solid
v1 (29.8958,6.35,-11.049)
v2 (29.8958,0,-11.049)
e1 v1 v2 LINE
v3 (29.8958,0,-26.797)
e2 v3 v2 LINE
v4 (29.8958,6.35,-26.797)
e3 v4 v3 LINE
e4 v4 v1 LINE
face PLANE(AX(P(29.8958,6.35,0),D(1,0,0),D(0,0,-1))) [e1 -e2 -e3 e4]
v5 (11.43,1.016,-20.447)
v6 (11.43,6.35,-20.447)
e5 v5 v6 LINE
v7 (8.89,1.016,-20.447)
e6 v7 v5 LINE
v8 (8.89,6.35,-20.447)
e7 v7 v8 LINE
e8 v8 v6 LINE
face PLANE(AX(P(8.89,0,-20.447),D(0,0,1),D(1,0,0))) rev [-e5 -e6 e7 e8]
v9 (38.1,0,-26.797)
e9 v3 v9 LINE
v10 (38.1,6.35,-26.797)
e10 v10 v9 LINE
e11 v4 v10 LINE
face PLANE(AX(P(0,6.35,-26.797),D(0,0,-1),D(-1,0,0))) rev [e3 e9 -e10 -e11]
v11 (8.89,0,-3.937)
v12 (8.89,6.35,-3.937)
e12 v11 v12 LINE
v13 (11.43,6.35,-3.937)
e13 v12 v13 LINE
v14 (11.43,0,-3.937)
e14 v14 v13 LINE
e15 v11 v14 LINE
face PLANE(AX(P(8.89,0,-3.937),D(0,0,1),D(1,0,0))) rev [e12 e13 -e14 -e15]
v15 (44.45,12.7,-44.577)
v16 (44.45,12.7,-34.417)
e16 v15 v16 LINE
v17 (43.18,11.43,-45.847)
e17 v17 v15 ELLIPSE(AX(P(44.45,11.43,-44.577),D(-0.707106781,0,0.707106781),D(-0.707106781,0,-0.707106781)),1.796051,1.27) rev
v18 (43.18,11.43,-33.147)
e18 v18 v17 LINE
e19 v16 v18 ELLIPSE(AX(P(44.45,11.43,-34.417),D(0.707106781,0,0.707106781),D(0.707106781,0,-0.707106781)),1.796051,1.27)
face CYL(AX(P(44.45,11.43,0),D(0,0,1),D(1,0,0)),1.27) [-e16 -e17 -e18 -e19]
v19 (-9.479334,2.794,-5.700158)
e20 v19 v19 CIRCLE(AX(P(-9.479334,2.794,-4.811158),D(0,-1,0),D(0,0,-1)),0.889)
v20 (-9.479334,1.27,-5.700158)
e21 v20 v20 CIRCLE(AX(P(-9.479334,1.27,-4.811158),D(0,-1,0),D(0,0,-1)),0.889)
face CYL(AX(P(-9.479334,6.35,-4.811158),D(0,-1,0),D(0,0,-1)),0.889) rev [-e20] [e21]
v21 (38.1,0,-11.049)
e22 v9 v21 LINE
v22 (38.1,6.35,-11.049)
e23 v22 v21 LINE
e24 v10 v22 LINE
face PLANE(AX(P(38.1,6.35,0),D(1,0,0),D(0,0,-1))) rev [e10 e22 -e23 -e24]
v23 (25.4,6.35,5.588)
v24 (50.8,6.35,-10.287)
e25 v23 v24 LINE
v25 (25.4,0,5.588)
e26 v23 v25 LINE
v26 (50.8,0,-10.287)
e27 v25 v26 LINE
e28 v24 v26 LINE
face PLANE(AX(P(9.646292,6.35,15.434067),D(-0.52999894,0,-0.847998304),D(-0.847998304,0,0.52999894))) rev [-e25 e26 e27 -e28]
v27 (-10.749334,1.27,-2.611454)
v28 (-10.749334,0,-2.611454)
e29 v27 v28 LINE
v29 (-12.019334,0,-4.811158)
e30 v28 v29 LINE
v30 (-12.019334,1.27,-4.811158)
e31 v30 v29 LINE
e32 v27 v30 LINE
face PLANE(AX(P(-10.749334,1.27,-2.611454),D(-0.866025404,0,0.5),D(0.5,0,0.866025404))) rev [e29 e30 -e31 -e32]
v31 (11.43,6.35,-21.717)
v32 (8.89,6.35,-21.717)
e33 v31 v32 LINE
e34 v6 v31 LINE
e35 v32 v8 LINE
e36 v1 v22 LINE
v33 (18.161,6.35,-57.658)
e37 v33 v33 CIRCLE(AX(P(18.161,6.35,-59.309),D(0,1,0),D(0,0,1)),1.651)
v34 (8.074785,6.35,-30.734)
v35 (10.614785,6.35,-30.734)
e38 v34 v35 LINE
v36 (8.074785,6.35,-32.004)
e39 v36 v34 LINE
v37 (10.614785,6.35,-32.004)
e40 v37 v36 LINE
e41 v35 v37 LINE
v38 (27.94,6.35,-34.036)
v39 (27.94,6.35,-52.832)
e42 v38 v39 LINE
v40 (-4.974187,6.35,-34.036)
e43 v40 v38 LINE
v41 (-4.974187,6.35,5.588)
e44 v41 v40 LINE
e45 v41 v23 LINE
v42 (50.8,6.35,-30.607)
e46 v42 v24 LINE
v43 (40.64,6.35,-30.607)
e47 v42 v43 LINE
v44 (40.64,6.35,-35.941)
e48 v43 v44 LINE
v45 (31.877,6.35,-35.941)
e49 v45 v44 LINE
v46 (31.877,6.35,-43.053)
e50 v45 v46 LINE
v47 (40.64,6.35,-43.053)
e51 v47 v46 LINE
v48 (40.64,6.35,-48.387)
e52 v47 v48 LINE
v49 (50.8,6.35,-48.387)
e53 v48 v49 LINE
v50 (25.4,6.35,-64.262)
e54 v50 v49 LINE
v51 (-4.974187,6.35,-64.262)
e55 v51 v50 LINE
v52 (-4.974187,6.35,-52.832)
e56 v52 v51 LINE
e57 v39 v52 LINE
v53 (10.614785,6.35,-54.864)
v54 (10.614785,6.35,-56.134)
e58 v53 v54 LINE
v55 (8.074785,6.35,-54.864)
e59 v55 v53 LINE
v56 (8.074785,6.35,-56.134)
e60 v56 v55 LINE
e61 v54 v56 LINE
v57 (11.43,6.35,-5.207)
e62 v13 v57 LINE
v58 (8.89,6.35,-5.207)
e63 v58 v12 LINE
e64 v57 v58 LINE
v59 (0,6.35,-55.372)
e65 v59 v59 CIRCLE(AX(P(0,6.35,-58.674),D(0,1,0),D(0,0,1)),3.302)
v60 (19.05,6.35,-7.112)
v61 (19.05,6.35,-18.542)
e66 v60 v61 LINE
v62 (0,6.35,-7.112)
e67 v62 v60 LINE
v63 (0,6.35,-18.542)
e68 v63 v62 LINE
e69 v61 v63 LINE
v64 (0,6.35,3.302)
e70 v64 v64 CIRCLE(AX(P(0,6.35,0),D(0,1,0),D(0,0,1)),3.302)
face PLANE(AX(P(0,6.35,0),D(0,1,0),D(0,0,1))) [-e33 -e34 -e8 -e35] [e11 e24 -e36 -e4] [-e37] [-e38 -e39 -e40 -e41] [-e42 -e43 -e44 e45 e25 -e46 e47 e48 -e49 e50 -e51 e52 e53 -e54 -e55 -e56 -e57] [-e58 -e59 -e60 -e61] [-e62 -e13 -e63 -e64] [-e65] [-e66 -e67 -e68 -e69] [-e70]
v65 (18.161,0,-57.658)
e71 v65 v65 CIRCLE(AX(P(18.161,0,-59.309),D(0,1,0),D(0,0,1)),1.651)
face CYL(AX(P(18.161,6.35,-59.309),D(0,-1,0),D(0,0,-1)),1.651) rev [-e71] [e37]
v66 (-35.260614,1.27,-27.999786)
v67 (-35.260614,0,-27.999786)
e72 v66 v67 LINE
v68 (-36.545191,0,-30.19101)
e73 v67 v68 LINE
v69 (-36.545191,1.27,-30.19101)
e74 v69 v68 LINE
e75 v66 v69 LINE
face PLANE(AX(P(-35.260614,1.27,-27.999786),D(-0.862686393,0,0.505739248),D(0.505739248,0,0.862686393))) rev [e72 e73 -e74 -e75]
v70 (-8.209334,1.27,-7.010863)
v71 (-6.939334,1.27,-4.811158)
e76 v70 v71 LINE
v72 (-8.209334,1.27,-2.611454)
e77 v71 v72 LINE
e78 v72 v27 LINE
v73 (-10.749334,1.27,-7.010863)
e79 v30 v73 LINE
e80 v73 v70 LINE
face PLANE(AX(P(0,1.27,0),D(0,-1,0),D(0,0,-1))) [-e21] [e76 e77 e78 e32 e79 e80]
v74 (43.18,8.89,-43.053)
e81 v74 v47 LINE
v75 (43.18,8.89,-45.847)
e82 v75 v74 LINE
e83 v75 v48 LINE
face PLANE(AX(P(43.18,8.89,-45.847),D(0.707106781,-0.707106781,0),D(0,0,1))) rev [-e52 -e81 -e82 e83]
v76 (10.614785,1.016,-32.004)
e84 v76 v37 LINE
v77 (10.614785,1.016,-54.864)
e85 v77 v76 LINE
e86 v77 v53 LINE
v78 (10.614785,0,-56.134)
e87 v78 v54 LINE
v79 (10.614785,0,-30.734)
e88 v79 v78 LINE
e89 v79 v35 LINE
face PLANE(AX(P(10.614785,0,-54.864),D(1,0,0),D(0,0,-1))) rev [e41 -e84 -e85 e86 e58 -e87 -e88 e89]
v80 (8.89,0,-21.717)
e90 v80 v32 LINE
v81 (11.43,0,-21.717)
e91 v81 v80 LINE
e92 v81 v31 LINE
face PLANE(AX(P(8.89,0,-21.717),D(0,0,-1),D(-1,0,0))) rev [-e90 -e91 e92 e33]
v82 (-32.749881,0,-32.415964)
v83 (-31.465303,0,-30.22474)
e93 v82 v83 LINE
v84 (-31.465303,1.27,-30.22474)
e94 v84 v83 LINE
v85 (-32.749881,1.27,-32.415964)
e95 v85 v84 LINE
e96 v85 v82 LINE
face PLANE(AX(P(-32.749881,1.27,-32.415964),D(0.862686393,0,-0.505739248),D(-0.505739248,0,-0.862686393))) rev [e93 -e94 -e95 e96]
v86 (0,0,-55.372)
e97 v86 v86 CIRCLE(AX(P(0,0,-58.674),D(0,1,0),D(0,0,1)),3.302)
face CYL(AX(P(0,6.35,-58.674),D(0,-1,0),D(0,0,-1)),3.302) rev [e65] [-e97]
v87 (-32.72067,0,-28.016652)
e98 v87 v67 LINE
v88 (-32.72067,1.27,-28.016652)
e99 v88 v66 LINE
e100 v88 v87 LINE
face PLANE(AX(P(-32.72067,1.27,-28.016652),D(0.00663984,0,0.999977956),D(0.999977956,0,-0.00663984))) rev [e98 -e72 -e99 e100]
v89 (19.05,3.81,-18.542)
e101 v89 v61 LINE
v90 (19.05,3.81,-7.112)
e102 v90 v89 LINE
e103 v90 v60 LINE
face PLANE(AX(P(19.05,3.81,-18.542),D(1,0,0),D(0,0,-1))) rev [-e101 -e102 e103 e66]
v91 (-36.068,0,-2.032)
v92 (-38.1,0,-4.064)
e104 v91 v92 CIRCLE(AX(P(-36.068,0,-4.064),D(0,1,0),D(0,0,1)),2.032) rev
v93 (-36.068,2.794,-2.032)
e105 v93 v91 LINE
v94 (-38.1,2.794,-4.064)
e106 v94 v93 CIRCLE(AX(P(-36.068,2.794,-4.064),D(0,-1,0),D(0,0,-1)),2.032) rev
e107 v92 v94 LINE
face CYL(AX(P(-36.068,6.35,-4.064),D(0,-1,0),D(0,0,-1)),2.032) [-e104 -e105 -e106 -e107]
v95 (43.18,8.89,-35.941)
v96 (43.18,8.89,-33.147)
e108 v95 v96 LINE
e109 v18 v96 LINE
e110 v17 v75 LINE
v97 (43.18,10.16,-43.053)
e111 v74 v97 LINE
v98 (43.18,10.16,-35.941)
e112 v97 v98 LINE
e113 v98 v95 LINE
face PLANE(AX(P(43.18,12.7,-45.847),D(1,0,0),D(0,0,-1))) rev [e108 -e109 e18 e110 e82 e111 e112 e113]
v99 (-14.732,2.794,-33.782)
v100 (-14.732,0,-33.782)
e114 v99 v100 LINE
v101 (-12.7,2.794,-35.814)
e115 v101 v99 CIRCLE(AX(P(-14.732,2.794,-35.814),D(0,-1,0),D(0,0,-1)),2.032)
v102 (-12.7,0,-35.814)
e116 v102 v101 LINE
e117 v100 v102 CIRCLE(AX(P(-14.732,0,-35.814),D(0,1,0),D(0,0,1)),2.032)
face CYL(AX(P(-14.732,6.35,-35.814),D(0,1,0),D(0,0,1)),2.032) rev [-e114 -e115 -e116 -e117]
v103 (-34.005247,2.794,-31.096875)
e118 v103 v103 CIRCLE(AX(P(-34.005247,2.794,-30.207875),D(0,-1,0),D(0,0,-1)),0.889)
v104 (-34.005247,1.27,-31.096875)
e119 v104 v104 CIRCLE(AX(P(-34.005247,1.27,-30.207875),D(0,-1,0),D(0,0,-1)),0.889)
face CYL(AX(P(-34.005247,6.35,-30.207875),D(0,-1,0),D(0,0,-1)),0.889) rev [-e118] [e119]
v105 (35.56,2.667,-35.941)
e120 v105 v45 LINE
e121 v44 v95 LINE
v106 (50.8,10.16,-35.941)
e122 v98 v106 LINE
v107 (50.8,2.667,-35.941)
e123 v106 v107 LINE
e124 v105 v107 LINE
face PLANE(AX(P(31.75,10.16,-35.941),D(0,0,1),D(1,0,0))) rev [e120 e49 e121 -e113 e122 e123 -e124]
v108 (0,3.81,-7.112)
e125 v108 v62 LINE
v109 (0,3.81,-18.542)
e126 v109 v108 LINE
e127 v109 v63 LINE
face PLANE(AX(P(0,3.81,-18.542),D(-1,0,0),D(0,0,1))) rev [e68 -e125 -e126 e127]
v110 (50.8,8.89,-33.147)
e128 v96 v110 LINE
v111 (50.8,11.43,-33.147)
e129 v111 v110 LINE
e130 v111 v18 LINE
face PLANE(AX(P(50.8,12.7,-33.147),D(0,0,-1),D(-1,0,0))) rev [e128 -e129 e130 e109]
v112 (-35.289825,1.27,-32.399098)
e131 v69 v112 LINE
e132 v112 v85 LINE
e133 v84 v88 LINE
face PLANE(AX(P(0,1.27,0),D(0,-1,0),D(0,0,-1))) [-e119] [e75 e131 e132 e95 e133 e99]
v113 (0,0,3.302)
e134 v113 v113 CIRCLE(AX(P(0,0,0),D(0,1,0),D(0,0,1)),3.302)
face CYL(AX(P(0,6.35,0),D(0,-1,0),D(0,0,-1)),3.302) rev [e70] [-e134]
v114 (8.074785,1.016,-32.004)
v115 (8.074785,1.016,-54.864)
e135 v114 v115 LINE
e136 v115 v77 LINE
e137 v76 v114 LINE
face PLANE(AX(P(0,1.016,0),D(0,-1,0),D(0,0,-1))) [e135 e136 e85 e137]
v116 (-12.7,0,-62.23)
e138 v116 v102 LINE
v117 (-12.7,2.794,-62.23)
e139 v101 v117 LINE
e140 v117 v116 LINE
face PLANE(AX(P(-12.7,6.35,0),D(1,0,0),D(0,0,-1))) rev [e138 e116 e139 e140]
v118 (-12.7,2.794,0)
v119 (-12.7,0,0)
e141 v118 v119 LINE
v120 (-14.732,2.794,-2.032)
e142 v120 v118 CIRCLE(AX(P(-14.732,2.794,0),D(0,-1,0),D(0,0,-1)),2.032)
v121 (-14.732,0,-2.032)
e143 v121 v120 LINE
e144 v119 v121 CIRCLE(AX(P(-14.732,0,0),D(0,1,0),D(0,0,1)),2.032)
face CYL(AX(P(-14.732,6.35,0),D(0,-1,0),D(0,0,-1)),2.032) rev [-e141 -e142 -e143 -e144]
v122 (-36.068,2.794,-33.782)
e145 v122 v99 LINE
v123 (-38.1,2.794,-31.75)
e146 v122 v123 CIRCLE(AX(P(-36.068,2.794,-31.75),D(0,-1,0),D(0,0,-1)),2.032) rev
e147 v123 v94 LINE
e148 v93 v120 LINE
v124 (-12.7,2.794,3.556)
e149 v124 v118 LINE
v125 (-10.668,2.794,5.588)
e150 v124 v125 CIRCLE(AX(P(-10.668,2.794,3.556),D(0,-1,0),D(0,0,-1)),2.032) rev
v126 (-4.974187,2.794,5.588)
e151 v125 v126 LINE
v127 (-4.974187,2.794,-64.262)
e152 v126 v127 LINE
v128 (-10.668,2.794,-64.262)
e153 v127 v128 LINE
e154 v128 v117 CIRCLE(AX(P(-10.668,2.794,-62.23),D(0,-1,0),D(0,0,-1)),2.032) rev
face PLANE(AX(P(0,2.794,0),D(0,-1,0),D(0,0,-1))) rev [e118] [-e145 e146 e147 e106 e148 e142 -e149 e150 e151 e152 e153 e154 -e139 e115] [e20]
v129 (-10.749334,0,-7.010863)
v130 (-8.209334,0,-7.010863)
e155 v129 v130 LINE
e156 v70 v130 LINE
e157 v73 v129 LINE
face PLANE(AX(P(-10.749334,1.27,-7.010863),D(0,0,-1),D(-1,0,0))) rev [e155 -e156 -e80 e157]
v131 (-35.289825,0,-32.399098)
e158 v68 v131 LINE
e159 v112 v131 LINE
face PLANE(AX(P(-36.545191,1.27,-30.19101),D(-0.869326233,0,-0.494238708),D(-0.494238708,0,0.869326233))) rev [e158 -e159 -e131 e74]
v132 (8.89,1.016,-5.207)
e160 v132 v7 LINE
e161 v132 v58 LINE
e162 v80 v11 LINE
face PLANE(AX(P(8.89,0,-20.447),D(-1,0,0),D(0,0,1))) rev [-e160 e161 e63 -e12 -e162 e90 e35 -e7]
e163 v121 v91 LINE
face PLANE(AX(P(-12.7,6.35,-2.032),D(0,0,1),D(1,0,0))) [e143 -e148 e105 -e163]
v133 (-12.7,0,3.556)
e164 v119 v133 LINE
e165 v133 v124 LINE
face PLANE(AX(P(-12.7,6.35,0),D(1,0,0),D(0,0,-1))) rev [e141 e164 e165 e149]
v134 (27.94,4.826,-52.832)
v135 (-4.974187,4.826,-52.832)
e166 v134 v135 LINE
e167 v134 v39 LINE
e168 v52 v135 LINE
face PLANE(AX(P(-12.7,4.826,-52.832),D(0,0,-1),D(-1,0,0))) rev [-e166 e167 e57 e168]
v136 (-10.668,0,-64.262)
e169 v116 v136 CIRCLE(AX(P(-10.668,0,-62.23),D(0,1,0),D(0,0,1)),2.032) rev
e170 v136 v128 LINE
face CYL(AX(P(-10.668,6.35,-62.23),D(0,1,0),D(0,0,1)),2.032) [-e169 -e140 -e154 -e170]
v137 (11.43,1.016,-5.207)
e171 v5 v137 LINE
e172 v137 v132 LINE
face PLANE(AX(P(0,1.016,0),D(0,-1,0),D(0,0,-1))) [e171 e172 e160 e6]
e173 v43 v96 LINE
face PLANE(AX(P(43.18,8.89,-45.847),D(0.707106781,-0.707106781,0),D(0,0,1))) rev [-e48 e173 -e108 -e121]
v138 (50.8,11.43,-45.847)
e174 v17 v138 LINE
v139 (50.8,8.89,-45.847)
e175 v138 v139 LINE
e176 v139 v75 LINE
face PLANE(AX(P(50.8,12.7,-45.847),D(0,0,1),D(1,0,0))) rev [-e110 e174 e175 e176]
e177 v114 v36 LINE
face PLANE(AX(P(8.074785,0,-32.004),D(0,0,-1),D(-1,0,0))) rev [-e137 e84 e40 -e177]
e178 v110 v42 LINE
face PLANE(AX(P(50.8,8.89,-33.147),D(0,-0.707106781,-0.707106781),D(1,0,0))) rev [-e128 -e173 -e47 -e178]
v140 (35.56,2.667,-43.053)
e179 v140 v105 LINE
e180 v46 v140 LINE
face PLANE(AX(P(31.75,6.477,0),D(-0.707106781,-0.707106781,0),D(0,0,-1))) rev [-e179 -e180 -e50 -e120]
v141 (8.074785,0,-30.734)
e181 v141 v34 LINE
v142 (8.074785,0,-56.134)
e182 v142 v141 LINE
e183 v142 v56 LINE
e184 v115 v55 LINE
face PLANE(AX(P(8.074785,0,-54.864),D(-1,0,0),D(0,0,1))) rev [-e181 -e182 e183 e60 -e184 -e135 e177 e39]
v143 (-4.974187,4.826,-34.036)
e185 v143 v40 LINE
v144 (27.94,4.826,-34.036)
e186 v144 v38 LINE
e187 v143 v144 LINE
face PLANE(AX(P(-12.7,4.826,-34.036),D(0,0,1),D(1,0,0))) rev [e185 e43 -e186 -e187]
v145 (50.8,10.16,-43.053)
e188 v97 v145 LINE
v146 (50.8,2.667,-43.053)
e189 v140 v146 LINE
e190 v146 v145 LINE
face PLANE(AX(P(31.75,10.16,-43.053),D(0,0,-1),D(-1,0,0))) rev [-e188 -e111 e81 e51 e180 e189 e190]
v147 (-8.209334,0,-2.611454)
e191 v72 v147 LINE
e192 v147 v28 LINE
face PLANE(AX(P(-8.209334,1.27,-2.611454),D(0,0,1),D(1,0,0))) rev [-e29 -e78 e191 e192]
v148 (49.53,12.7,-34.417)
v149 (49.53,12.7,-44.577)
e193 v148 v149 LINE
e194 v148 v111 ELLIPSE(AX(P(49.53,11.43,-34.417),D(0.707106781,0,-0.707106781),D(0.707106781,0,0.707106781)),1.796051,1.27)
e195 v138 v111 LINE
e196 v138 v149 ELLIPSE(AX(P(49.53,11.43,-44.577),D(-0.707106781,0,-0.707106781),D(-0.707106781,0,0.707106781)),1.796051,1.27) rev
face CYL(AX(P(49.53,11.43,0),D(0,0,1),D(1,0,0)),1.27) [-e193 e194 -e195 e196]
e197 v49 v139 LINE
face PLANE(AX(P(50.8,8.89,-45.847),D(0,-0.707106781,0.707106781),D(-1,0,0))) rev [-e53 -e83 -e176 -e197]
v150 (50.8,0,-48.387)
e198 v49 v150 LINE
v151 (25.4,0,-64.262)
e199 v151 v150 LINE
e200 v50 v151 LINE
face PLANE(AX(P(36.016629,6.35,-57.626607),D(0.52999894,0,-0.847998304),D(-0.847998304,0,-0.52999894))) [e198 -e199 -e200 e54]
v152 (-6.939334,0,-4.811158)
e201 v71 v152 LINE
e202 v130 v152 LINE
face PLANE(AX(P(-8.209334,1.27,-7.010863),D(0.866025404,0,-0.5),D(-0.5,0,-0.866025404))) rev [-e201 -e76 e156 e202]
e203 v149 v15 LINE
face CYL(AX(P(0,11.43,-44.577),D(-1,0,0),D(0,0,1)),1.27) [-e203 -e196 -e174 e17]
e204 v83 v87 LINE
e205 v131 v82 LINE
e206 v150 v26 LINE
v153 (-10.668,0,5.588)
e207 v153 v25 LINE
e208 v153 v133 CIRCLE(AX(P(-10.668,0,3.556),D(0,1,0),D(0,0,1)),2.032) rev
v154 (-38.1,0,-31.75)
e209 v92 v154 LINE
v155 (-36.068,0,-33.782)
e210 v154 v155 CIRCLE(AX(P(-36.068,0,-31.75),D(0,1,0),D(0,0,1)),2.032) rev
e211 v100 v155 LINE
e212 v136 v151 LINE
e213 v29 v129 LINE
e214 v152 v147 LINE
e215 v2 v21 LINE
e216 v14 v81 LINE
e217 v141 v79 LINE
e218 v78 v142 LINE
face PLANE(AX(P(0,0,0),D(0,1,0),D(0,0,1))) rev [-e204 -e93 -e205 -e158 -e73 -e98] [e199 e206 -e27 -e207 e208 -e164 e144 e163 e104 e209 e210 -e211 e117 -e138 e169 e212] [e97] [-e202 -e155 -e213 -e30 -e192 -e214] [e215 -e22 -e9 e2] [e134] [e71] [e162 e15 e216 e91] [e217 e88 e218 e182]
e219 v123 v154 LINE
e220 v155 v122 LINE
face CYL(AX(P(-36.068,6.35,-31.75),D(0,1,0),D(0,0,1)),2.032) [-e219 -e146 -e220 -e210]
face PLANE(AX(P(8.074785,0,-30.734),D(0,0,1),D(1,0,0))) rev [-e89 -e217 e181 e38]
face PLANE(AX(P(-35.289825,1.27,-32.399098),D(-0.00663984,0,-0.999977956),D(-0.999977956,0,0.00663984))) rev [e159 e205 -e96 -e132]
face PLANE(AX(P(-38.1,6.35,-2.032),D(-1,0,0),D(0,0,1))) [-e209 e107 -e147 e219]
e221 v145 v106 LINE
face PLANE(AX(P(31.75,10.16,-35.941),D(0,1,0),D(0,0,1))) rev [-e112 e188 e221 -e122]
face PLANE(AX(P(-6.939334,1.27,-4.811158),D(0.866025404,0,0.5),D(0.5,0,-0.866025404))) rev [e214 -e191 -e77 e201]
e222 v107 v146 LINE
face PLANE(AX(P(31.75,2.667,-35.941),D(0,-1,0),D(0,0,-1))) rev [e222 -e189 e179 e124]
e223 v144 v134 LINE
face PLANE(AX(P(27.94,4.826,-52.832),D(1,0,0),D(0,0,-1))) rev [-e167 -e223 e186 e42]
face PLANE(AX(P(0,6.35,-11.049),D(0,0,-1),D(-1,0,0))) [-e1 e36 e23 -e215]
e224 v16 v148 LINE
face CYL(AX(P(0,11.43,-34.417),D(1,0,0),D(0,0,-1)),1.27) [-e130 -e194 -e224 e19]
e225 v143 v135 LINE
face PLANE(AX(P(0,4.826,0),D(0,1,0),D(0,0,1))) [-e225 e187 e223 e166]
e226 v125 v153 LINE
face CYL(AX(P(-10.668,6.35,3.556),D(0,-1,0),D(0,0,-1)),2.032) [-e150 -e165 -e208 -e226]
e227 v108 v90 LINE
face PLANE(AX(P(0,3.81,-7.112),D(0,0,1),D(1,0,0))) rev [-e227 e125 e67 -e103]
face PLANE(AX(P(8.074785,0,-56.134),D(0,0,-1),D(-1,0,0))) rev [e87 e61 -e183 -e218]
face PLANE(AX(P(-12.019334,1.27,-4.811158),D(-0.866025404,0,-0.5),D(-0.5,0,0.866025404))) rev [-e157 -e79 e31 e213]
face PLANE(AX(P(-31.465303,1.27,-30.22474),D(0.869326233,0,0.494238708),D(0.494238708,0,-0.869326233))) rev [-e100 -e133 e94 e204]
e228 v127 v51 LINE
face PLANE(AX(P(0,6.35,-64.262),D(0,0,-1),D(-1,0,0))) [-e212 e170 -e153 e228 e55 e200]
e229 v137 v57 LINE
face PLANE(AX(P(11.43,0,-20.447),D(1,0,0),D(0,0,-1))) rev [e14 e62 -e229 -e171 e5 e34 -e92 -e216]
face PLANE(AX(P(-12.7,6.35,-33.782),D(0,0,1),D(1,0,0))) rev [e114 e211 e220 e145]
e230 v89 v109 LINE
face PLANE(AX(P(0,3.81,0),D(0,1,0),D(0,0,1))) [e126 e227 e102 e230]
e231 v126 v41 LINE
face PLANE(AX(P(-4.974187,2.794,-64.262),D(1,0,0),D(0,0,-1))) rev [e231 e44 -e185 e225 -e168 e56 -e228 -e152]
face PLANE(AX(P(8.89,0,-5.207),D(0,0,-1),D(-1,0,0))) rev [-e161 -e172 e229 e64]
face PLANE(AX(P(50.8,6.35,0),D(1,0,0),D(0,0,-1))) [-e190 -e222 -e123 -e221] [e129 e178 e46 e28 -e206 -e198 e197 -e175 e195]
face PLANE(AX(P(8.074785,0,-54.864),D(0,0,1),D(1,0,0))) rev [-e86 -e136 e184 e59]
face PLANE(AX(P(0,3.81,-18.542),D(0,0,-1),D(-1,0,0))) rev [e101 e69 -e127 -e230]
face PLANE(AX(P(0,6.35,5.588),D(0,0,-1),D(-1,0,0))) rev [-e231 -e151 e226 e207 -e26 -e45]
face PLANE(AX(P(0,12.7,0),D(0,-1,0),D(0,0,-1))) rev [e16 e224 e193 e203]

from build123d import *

# Parameters (mm, degrees)
SKETCH1_R               = 1.651
SKETCH1_R_2             = 3.302
SKETCH1_R_3             = 0.889
SKETCH1_W               = 8.2042
SKETCH1_H               = 15.748
BOSS_EXTRUDE1_DEPTH     = 6.35
SKETCH2_W               = 19.05
SKETCH2_H               = 11.43
CUT_EXTRUDE1_DEPTH      = 2.54
CUT_EXTRUDE2_DEPTH      = 83.161835082
CUT_EXTRUDE2_DEPTH_BACK = 83.161835082
SKETCH5_W               = 2.54
SKETCH5_H               = 1.27
SKETCH6_W               = 2.54
SKETCH6_H               = 15.24
CUT_EXTRUDE3_DEPTH      = 1.016
SKETCH7_W               = 40.64
SKETCH7_H               = 18.796
CUT_EXTRUDE4_DEPTH      = 1.524
CUT_EXTRUDE5_DEPTH      = 83.161835082
CUT_EXTRUDE5_DEPTH_BACK = 83.161835082
SKETCH8_W               = 2.54
SKETCH8_H               = 1.27
SKETCH10_W              = 2.54
SKETCH10_H              = 22.86
CUT_EXTRUDE6_DEPTH      = 1.016
SKETCH11_W              = 7.62
SKETCH11_H              = 12.7
BOSS_EXTRUDE2_DEPTH     = 6.35
SKETCH13_W              = 7.112
SKETCH13_H              = 7.493
CUT_EXTRUDE7_DEPTH      = 19.05
CHAMFER3_SIZE           = 2.54
FILLET1_R               = 1.27
CHAMFER4_SIZE           = 3.81
SKETCH14_W              = 33.125812981
SKETCH14_H              = 69.85
CUT_EXTRUDE8_DEPTH      = 3.556
FILLET2_R               = 2.032
CUT_EXTRUDE9_DEPTH      = 1.27


with BuildPart() as part:
    # Sketch1 → Boss-Extrude1 (new body)
    with BuildSketch(Plane(origin=(0, 0, 0), x_dir=(1, 0, 0), z_dir=(0, 1, 0))):
        Polygon((25.4, 64.262), (-12.7, 64.262), (-12.7, 33.782), (-38.1, 33.782), (-38.1, 2.032), (-12.7, 2.032), (-12.7, -5.588), (25.4, -5.588), (50.8, 10.287), (50.8, 48.387), align=None)
        with Locations(Location((18.161, 59.309, 0), (0, 0, 270))):
            Circle(SKETCH1_R, mode=Mode.SUBTRACT)
        with Locations(Location((0, 0, 0), (0, 0, 270))):
            Circle(SKETCH1_R_2, mode=Mode.SUBTRACT)
        with Locations(Location((-9.47933438, 4.811158086, 0), (0, 0, 270))):
            Circle(SKETCH1_R_3, mode=Mode.SUBTRACT)
        with Locations(Location((0, 58.674, 0), (0, 0, 270))):
            Circle(SKETCH1_R_2, mode=Mode.SUBTRACT)
        with Locations((33.9979, 18.923)):
            Rectangle(SKETCH1_W, SKETCH1_H, mode=Mode.SUBTRACT)
        with Locations(Location((-34.005247297, 30.20787503, 0), (0, 0, 270))):
            Circle(SKETCH1_R_3, mode=Mode.SUBTRACT)
    extrude(amount=BOSS_EXTRUDE1_DEPTH)

    # Sketch2 → Cut-Extrude1 (cut)
    with BuildSketch(Plane(origin=(0, 6.35, 0), x_dir=(1, 0, 0), z_dir=(0, 1, 0))):
        with Locations((9.525, 12.827)):
            Rectangle(SKETCH2_W, SKETCH2_H)
    extrude(amount=-CUT_EXTRUDE1_DEPTH, mode=Mode.SUBTRACT)

    # Sketch5 → Cut-Extrude2 (cut, two sides: drawn at the far end of the back side and taken through both)
    with BuildSketch(Plane(origin=(0, 6.35, 0), x_dir=(1, 0, 0), z_dir=(0, 1, 0)).offset(-CUT_EXTRUDE2_DEPTH_BACK)):
        with Locations((10.16, 21.082)):
            Rectangle(SKETCH5_W, SKETCH5_H)
        with Locations((10.16, 4.572)):
            Rectangle(SKETCH5_W, SKETCH5_H)
    extrude(amount=CUT_EXTRUDE2_DEPTH + CUT_EXTRUDE2_DEPTH_BACK, mode=Mode.SUBTRACT)

    # Sketch6 → Cut-Extrude3 (cut)
    with BuildSketch(Plane.XZ):
        with Locations((10.16, -12.827)):
            Rectangle(SKETCH6_W, SKETCH6_H)
    extrude(amount=-CUT_EXTRUDE3_DEPTH, mode=Mode.SUBTRACT)

    # Sketch7 → Cut-Extrude4 (cut)
    with BuildSketch(Plane(origin=(0, 6.35, 0), x_dir=(1, 0, 0), z_dir=(0, 1, 0))):
        with Locations((7.62, 43.434)):
            Rectangle(SKETCH7_W, SKETCH7_H)
    extrude(amount=-CUT_EXTRUDE4_DEPTH, mode=Mode.SUBTRACT)

    # Sketch8 → Cut-Extrude5 (cut, two sides: drawn at the far end of the back side and taken through both)
    with BuildSketch(Plane(origin=(0, 6.35, 0), x_dir=(1, 0, 0), z_dir=(0, 1, 0)).offset(-CUT_EXTRUDE5_DEPTH_BACK)):
        with Locations((9.344785272, 55.499)):
            Rectangle(SKETCH8_W, SKETCH8_H)
        with Locations((9.344785272, 31.369)):
            Rectangle(SKETCH8_W, SKETCH8_H)
    extrude(amount=CUT_EXTRUDE5_DEPTH + CUT_EXTRUDE5_DEPTH_BACK, mode=Mode.SUBTRACT)

    # Sketch10 → Cut-Extrude6 (cut)
    with BuildSketch(Plane.XZ):
        with Locations((9.344785272, -43.434)):
            Rectangle(SKETCH10_W, SKETCH10_H)
    extrude(amount=-CUT_EXTRUDE6_DEPTH, mode=Mode.SUBTRACT)

    # Sketch11 → Boss-Extrude2 (add)
    with BuildSketch(Plane(origin=(0, 6.35, 0), x_dir=(1, 0, 0), z_dir=(0, 1, 0))):
        with Locations((46.99, 39.497)):
            Rectangle(SKETCH11_W, SKETCH11_H)
    extrude(amount=BOSS_EXTRUDE2_DEPTH)

    # Sketch13 → Cut-Extrude7 (cut)
    with BuildSketch(Plane(origin=(50.8, 0, 0), x_dir=(0, 0, -1), z_dir=(1, 0, 0))):
        with Locations((39.497, 6.4135)):
            Rectangle(SKETCH13_W, SKETCH13_H)
    extrude(amount=-CUT_EXTRUDE7_DEPTH, mode=Mode.SUBTRACT)

    # Chamfer3
    chamfer3_edges = [part.edges().sort_by_distance(p)[0] for p in [
        (46.99, 6.35, -45.847),
        (43.18, 6.35, -44.45),
        (46.99, 6.35, -33.147),
        (43.18, 6.35, -34.544),
    ]]
    chamfer(chamfer3_edges, length=CHAMFER3_SIZE)

    # Fillet1
    fillet1_edges = [part.edges().sort_by_distance(p)[0] for p in [
        (50.8, 12.7, -39.497),
        (46.99, 12.7, -45.847),
        (43.18, 12.7, -39.497),
        (46.99, 12.7, -33.147),
    ]]
    fillet(fillet1_edges, radius=FILLET1_R)

    # Chamfer4
    # the kernel refuses this chamfer: 3.81 mm, written as the material it adds along each edge
    with BuildSketch(Plane(origin=(31.75, 2.667, -52.851112184), x_dir=(0.9996219169112968, -0.027495876610586386, 0), z_dir=(0, 0, 1))) as chamfer4_piece_1_section:
        Polygon((CHAMFER4_SIZE * 0.999621916911, CHAMFER4_SIZE * 0.0274958766106), (-CHAMFER4_SIZE * 0.0274958766106, CHAMFER4_SIZE * 0.999621916911), (0, 0), align=None)
    chamfer4_piece_1 = extrude(amount=26.708224368, mode=Mode.PRIVATE)
    chamfer4_piece_1 = split(chamfer4_piece_1, bisect_by=Plane(origin=(33.021365591, 6.35, -39.497), z_dir=(0, -1, 0)), keep=Keep.TOP, mode=Mode.PRIVATE)
    chamfer4_piece_1 = split(chamfer4_piece_1, bisect_by=Plane(origin=(33.021365591, 3.934268817, -26.797), z_dir=(0, 0, -1)), keep=Keep.TOP, mode=Mode.PRIVATE)
    add(chamfer4_piece_1)

    # Sketch14 → Cut-Extrude8 (cut)
    with BuildSketch(Plane(origin=(0, 6.35, 0), x_dir=(1, 0, 0), z_dir=(0, 1, 0))):
        with Locations((-21.53709351, 29.337)):
            Rectangle(SKETCH14_W, SKETCH14_H)
    extrude(amount=-CUT_EXTRUDE8_DEPTH, mode=Mode.SUBTRACT)

    # Fillet2
    fillet2_edges = [part.edges().sort_by_distance(p)[0] for p in [
        (-38.1, 1.397, -33.782),
        (-12.7, 1.397, -33.782),
        (-12.7, 1.397, -2.032),
        (-38.1, 1.397, -2.032),
        (-12.7, 1.397, -64.262),
        (-12.7, 1.397, 5.588),
    ]]
    fillet(fillet2_edges, radius=FILLET2_R)

    # Sketch16 → Cut-Extrude9 (cut)
    with BuildSketch(Plane.XZ):
        Polygon((-10.74933438, -7.010862612), (-8.20933438, -7.010862612), (-6.93933438, -4.811158086), (-8.20933438, -2.61145356), (-10.74933438, -2.61145356), (-12.01933438, -4.811158086), align=None)
        Polygon((-32.74988098, -32.415963663), (-31.465303289, -30.224740225), (-32.720669607, -28.016651592), (-35.260613615, -27.999786398), (-36.545191306, -30.191009836), (-35.289824988, -32.399098469), align=None)
    extrude(amount=-CUT_EXTRUDE9_DEPTH, mode=Mode.SUBTRACT)


solid = part.part
